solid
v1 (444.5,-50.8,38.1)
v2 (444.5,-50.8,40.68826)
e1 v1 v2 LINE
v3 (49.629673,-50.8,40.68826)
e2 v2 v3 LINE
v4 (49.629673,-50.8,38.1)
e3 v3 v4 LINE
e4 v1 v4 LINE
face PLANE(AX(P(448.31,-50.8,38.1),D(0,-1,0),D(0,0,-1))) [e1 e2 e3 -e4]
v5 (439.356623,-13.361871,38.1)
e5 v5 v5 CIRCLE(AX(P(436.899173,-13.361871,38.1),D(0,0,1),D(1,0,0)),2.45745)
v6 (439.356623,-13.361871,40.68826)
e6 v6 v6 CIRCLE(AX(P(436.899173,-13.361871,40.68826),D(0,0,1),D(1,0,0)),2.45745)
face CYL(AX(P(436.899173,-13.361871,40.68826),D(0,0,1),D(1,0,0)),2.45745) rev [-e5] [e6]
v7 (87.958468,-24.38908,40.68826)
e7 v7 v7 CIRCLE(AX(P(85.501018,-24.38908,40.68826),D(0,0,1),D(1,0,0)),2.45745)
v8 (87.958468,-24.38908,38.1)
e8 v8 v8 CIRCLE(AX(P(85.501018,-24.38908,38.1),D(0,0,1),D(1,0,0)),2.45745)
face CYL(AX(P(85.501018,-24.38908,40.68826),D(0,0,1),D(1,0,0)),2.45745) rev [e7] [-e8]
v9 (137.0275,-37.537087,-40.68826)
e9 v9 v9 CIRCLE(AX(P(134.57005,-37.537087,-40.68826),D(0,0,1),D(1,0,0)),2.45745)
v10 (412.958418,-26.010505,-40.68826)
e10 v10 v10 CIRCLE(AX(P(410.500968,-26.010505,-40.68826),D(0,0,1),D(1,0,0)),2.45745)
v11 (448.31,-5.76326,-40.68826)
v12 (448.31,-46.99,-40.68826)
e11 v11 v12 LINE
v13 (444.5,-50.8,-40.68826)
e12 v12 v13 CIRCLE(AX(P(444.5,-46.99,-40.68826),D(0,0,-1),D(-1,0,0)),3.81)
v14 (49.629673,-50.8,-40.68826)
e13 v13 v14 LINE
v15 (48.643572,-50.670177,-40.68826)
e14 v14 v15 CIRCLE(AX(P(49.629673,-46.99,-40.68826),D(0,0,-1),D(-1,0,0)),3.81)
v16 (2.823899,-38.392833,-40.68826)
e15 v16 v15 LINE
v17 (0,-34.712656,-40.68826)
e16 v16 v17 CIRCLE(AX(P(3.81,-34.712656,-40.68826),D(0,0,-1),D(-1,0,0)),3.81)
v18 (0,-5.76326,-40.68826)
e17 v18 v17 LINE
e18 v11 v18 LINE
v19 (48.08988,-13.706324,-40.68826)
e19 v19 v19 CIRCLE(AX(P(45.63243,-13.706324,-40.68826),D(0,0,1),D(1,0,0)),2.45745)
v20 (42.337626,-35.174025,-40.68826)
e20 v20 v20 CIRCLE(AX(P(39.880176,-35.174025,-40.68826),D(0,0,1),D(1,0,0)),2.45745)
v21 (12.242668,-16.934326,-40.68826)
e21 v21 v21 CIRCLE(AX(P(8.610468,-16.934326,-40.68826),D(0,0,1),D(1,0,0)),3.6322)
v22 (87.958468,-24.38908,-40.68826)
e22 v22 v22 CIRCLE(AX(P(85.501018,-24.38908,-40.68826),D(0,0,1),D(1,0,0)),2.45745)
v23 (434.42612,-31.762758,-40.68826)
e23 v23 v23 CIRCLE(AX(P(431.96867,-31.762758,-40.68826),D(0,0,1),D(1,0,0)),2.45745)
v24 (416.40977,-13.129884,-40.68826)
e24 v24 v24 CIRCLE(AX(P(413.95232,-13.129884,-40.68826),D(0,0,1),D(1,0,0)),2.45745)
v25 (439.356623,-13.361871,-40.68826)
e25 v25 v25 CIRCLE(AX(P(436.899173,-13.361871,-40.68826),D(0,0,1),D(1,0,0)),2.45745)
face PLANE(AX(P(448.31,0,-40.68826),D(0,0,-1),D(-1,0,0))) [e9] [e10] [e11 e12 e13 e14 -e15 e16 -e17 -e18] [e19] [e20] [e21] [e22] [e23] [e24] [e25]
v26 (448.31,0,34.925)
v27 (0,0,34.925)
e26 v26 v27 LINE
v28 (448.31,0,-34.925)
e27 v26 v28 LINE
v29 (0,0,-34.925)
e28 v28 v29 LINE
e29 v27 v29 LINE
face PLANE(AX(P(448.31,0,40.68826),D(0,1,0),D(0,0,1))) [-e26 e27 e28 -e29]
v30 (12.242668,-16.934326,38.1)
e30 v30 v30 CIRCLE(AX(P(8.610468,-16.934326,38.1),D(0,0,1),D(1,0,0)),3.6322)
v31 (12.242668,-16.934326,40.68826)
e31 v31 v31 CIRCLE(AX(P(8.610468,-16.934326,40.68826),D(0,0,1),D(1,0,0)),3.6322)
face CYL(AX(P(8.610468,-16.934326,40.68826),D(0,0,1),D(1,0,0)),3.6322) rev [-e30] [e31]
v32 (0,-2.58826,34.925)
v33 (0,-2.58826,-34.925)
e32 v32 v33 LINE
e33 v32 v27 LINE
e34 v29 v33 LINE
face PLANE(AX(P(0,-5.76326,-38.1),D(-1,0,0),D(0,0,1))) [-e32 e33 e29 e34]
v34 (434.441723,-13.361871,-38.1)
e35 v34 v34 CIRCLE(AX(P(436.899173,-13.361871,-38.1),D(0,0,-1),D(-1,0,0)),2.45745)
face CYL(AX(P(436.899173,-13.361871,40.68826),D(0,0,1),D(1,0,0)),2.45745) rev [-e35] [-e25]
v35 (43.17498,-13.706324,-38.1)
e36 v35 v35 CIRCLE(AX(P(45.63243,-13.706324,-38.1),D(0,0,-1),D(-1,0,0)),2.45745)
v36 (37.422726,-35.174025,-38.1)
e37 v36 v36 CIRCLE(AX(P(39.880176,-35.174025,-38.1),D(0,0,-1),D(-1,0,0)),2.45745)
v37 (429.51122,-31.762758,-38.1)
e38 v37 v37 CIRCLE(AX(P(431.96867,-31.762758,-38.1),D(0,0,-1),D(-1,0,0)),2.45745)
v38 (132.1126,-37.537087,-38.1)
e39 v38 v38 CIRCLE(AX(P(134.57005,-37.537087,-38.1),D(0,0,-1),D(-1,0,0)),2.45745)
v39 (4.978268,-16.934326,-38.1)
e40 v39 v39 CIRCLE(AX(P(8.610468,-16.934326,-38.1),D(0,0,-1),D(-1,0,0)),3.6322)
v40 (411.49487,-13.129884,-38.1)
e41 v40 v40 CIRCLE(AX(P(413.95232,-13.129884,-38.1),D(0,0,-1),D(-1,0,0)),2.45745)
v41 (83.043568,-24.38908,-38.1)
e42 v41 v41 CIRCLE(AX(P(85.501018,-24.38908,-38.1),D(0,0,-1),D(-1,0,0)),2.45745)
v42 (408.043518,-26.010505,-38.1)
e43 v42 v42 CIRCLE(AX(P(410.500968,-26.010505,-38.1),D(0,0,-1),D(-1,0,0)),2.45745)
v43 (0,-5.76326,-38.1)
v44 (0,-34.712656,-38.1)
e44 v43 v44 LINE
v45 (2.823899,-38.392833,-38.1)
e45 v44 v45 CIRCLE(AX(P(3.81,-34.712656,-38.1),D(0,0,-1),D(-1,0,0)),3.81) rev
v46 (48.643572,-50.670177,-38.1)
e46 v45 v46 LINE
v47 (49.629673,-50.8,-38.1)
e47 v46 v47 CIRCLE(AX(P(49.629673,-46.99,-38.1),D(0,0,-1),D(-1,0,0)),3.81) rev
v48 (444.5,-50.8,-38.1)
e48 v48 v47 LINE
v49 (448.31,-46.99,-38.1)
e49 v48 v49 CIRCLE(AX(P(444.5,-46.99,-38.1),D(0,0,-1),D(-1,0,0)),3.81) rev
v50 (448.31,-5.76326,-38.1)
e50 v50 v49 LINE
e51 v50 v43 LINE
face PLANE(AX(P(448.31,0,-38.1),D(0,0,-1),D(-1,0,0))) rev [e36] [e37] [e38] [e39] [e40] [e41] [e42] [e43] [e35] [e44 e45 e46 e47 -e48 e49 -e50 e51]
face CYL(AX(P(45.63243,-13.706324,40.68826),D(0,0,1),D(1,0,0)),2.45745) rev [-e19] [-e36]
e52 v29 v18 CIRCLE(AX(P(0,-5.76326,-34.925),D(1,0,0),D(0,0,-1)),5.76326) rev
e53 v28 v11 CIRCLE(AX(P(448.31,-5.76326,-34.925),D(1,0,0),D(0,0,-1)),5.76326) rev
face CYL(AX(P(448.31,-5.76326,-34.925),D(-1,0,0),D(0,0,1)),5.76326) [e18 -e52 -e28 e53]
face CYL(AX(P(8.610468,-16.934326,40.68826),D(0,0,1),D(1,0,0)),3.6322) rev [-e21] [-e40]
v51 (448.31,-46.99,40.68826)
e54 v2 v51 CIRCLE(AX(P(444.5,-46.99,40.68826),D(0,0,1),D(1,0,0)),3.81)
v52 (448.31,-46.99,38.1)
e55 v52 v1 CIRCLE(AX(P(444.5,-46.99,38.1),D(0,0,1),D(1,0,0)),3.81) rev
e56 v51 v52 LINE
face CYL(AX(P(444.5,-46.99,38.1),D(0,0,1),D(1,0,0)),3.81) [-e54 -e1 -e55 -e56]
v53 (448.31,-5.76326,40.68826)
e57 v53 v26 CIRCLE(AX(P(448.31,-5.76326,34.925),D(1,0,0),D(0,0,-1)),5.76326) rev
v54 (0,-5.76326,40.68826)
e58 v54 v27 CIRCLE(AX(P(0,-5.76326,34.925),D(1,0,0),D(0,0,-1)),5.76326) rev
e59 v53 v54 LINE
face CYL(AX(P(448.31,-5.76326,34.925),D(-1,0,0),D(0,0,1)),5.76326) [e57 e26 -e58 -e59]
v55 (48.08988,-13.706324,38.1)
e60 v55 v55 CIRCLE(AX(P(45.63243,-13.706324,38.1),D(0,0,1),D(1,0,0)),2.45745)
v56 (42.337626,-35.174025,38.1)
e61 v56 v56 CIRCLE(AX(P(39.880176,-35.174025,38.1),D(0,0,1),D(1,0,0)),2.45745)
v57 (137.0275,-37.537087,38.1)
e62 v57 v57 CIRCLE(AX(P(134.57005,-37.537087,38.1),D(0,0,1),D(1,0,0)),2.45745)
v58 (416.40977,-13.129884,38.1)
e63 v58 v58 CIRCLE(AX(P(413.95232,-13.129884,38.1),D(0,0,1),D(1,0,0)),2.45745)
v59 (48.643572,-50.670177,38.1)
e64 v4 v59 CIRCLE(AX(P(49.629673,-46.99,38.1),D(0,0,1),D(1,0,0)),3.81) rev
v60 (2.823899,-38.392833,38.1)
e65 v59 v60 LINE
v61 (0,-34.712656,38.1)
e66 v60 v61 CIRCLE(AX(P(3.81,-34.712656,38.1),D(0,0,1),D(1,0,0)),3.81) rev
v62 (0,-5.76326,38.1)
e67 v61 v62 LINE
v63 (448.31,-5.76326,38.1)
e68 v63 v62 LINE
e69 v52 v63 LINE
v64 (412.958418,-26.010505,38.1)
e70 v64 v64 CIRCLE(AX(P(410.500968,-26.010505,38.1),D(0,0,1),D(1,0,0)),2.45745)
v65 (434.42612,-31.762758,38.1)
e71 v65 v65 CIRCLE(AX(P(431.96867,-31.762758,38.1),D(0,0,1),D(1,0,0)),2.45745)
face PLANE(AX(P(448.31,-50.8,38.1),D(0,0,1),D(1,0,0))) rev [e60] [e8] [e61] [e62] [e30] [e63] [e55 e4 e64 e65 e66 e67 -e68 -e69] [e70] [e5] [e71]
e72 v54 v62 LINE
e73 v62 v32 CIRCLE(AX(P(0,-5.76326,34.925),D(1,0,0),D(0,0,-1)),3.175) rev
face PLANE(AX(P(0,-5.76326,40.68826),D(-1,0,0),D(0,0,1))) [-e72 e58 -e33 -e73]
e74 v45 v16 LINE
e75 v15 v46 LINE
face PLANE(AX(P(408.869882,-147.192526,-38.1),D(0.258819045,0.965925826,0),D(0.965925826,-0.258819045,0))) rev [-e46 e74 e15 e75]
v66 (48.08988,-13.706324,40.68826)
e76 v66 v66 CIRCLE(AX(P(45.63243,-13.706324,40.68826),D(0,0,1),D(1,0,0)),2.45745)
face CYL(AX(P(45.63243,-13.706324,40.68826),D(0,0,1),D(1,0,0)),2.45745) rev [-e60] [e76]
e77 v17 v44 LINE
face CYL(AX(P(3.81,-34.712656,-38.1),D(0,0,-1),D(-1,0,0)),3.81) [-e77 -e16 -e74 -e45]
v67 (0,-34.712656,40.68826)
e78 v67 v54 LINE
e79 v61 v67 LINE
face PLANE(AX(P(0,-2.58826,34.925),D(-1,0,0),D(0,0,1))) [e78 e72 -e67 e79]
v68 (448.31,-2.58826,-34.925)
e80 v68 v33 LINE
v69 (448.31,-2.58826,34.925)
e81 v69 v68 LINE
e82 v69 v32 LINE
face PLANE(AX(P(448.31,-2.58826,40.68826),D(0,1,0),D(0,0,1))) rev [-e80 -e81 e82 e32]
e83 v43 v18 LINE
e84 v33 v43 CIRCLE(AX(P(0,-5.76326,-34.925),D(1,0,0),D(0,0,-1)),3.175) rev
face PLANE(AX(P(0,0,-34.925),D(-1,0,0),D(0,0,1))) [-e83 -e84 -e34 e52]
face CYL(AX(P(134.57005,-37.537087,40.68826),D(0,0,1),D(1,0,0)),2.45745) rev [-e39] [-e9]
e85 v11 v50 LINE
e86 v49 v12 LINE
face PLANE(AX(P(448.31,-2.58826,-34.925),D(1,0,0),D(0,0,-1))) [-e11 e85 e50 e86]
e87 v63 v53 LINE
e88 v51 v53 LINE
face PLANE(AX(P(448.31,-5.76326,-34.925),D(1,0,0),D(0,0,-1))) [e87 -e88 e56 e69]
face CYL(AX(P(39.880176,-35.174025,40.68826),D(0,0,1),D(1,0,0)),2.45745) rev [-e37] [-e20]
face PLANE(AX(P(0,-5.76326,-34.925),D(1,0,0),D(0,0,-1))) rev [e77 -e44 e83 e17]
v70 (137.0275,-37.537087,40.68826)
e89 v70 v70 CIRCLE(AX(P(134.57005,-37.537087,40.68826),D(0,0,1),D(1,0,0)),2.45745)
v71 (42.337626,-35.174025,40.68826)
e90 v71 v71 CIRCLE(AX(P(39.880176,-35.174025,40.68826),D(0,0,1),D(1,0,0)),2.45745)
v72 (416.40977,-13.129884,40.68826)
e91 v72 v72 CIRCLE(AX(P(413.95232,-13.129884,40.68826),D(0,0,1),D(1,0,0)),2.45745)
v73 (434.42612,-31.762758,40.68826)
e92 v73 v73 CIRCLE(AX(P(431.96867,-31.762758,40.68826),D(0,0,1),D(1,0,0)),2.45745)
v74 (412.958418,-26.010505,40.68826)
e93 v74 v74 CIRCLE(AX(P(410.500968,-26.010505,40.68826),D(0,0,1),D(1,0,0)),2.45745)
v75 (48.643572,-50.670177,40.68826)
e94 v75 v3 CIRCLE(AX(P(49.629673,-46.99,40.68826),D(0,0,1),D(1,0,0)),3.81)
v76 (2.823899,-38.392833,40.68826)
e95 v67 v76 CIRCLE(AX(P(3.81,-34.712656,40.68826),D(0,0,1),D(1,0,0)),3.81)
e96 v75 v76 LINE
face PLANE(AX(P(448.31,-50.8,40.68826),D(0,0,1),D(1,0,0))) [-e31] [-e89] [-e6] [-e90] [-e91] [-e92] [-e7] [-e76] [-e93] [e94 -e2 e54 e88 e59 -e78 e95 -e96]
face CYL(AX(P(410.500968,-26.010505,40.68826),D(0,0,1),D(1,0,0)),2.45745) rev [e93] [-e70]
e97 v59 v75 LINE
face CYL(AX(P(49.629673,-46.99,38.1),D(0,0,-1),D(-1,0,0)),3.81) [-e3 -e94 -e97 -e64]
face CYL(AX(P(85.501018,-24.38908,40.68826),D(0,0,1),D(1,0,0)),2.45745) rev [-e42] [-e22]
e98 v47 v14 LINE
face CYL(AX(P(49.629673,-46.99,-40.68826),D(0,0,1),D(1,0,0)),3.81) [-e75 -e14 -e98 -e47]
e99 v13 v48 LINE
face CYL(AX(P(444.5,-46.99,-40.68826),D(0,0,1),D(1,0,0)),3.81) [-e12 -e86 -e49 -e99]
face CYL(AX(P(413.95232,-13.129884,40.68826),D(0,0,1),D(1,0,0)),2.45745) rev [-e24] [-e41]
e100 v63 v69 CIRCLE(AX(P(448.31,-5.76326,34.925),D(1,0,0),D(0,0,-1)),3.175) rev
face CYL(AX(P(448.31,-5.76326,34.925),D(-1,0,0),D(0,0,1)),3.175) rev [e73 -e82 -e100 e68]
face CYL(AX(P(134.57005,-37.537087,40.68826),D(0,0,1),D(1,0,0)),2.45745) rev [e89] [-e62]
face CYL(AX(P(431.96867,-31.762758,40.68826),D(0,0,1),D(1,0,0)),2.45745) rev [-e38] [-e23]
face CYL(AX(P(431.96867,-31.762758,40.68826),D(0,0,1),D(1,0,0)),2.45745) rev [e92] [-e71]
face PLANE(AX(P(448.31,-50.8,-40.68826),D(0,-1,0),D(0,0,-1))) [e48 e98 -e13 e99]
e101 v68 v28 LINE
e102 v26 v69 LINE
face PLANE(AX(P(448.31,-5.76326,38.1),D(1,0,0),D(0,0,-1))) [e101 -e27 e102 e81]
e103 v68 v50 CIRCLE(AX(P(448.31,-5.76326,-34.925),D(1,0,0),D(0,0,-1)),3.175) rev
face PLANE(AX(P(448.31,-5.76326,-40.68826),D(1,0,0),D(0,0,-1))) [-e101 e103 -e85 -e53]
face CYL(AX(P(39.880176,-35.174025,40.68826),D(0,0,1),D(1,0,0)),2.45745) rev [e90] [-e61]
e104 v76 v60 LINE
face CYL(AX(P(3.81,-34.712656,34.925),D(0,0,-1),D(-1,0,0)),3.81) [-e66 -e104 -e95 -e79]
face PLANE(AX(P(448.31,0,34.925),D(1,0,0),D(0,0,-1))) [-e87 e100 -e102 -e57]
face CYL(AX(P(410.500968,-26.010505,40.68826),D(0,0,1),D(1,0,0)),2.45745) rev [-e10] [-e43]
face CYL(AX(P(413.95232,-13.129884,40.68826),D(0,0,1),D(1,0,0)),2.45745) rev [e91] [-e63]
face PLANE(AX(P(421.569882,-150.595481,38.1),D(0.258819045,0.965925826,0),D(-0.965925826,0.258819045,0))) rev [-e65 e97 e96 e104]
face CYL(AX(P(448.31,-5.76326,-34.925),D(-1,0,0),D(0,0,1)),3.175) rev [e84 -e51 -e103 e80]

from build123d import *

# Parameters (mm, degrees)
BASE_FLANGE1_DEPTH           = 448.31
CUT_EXTRUDE1_DEPTH           = 459.458977562
F_1_4_CLEARANCE_HOLE1_D      = 7.2644
F_10_0_1935_DIAMETER_HOLE1_D = 4.9149
FILLET1_R                    = 3.81


# Sheet-metal steps are written as plain solids
with BuildPart() as part:
    # Sketch2 → Base-Flange1 (new body)
    with BuildSketch(Plane(origin=(0, 0, 0), x_dir=(0, 0, -1), z_dir=(1, 0, 0))):
        with BuildLine():
            Line((-40.68826, -50.8), (-40.68826, -5.76326))
            ThreePointArc((-40.68826, -5.76326), (-39.000240228, -1.688019772), (-34.925, 0))
            Line((-34.925, 0), (34.925, 0))
            ThreePointArc((34.925, 0), (39.000240228, -1.688019772), (40.68826, -5.76326))
            Line((40.68826, -5.76326), (40.68826, -50.8))
            Line((40.68826, -50.8), (38.1, -50.8))
            Line((38.1, -50.8), (38.1, -5.76326))
            ThreePointArc((38.1, -5.76326), (37.17006403, -3.51819597), (34.925, -2.58826))
            Line((34.925, -2.58826), (-34.925, -2.58826))
            ThreePointArc((-34.925, -2.58826), (-37.17006403, -3.51819597), (-38.1, -5.76326))
            Line((-38.1, -5.76326), (-38.1, -50.8))
            Line((-38.1, -50.8), (-40.68826, -50.8))
        make_face()
    extrude(amount=BASE_FLANGE1_DEPTH)

    # Sketch8 → Cut-Extrude1 (cut, through all)
    with BuildSketch(Plane.XY.offset(40.68826)):
        Polygon((0, -37.636171444), (49.128076995, -50.8), (0, -50.8), align=None)
    extrude(amount=-CUT_EXTRUDE1_DEPTH, mode=Mode.SUBTRACT)

    # 1/4 Clearance Hole1 (through all)
    with Locations(Plane.XY.offset(40.68826)):
        with Locations((8.61046841, -16.934326391)):
            Hole(F_1_4_CLEARANCE_HOLE1_D / 2)

    # #10 (0.1935) Diameter Hole1 (through all)
    with Locations(Plane.XY.offset(40.68826)):
        with Locations((410.50096824, -26.010505082), (413.952320207, -13.129884188), (436.899172539, -13.361871369), (431.968669729, -31.762758359), (39.880176489, -35.174025037), (45.632429766, -13.706323547), (85.501018246, -24.389079634), (134.570050222, -37.537087125)):
            Hole(F_10_0_1935_DIAMETER_HOLE1_D / 2)

    # Fillet1
    fillet1_edges = [part.edges().sort_by_distance(p)[0] for p in [
        (448.31, -50.8, 39.39413),
        (49.128076995, -50.8, -39.39413),
        (0, -37.636171444, -39.39413),
        (0, -37.636171444, 39.39413),
        (49.128076995, -50.8, 39.39413),
        (448.31, -50.8, -39.39413),
    ]]
    fillet(fillet1_edges, radius=FILLET1_R)


solid = part.part
